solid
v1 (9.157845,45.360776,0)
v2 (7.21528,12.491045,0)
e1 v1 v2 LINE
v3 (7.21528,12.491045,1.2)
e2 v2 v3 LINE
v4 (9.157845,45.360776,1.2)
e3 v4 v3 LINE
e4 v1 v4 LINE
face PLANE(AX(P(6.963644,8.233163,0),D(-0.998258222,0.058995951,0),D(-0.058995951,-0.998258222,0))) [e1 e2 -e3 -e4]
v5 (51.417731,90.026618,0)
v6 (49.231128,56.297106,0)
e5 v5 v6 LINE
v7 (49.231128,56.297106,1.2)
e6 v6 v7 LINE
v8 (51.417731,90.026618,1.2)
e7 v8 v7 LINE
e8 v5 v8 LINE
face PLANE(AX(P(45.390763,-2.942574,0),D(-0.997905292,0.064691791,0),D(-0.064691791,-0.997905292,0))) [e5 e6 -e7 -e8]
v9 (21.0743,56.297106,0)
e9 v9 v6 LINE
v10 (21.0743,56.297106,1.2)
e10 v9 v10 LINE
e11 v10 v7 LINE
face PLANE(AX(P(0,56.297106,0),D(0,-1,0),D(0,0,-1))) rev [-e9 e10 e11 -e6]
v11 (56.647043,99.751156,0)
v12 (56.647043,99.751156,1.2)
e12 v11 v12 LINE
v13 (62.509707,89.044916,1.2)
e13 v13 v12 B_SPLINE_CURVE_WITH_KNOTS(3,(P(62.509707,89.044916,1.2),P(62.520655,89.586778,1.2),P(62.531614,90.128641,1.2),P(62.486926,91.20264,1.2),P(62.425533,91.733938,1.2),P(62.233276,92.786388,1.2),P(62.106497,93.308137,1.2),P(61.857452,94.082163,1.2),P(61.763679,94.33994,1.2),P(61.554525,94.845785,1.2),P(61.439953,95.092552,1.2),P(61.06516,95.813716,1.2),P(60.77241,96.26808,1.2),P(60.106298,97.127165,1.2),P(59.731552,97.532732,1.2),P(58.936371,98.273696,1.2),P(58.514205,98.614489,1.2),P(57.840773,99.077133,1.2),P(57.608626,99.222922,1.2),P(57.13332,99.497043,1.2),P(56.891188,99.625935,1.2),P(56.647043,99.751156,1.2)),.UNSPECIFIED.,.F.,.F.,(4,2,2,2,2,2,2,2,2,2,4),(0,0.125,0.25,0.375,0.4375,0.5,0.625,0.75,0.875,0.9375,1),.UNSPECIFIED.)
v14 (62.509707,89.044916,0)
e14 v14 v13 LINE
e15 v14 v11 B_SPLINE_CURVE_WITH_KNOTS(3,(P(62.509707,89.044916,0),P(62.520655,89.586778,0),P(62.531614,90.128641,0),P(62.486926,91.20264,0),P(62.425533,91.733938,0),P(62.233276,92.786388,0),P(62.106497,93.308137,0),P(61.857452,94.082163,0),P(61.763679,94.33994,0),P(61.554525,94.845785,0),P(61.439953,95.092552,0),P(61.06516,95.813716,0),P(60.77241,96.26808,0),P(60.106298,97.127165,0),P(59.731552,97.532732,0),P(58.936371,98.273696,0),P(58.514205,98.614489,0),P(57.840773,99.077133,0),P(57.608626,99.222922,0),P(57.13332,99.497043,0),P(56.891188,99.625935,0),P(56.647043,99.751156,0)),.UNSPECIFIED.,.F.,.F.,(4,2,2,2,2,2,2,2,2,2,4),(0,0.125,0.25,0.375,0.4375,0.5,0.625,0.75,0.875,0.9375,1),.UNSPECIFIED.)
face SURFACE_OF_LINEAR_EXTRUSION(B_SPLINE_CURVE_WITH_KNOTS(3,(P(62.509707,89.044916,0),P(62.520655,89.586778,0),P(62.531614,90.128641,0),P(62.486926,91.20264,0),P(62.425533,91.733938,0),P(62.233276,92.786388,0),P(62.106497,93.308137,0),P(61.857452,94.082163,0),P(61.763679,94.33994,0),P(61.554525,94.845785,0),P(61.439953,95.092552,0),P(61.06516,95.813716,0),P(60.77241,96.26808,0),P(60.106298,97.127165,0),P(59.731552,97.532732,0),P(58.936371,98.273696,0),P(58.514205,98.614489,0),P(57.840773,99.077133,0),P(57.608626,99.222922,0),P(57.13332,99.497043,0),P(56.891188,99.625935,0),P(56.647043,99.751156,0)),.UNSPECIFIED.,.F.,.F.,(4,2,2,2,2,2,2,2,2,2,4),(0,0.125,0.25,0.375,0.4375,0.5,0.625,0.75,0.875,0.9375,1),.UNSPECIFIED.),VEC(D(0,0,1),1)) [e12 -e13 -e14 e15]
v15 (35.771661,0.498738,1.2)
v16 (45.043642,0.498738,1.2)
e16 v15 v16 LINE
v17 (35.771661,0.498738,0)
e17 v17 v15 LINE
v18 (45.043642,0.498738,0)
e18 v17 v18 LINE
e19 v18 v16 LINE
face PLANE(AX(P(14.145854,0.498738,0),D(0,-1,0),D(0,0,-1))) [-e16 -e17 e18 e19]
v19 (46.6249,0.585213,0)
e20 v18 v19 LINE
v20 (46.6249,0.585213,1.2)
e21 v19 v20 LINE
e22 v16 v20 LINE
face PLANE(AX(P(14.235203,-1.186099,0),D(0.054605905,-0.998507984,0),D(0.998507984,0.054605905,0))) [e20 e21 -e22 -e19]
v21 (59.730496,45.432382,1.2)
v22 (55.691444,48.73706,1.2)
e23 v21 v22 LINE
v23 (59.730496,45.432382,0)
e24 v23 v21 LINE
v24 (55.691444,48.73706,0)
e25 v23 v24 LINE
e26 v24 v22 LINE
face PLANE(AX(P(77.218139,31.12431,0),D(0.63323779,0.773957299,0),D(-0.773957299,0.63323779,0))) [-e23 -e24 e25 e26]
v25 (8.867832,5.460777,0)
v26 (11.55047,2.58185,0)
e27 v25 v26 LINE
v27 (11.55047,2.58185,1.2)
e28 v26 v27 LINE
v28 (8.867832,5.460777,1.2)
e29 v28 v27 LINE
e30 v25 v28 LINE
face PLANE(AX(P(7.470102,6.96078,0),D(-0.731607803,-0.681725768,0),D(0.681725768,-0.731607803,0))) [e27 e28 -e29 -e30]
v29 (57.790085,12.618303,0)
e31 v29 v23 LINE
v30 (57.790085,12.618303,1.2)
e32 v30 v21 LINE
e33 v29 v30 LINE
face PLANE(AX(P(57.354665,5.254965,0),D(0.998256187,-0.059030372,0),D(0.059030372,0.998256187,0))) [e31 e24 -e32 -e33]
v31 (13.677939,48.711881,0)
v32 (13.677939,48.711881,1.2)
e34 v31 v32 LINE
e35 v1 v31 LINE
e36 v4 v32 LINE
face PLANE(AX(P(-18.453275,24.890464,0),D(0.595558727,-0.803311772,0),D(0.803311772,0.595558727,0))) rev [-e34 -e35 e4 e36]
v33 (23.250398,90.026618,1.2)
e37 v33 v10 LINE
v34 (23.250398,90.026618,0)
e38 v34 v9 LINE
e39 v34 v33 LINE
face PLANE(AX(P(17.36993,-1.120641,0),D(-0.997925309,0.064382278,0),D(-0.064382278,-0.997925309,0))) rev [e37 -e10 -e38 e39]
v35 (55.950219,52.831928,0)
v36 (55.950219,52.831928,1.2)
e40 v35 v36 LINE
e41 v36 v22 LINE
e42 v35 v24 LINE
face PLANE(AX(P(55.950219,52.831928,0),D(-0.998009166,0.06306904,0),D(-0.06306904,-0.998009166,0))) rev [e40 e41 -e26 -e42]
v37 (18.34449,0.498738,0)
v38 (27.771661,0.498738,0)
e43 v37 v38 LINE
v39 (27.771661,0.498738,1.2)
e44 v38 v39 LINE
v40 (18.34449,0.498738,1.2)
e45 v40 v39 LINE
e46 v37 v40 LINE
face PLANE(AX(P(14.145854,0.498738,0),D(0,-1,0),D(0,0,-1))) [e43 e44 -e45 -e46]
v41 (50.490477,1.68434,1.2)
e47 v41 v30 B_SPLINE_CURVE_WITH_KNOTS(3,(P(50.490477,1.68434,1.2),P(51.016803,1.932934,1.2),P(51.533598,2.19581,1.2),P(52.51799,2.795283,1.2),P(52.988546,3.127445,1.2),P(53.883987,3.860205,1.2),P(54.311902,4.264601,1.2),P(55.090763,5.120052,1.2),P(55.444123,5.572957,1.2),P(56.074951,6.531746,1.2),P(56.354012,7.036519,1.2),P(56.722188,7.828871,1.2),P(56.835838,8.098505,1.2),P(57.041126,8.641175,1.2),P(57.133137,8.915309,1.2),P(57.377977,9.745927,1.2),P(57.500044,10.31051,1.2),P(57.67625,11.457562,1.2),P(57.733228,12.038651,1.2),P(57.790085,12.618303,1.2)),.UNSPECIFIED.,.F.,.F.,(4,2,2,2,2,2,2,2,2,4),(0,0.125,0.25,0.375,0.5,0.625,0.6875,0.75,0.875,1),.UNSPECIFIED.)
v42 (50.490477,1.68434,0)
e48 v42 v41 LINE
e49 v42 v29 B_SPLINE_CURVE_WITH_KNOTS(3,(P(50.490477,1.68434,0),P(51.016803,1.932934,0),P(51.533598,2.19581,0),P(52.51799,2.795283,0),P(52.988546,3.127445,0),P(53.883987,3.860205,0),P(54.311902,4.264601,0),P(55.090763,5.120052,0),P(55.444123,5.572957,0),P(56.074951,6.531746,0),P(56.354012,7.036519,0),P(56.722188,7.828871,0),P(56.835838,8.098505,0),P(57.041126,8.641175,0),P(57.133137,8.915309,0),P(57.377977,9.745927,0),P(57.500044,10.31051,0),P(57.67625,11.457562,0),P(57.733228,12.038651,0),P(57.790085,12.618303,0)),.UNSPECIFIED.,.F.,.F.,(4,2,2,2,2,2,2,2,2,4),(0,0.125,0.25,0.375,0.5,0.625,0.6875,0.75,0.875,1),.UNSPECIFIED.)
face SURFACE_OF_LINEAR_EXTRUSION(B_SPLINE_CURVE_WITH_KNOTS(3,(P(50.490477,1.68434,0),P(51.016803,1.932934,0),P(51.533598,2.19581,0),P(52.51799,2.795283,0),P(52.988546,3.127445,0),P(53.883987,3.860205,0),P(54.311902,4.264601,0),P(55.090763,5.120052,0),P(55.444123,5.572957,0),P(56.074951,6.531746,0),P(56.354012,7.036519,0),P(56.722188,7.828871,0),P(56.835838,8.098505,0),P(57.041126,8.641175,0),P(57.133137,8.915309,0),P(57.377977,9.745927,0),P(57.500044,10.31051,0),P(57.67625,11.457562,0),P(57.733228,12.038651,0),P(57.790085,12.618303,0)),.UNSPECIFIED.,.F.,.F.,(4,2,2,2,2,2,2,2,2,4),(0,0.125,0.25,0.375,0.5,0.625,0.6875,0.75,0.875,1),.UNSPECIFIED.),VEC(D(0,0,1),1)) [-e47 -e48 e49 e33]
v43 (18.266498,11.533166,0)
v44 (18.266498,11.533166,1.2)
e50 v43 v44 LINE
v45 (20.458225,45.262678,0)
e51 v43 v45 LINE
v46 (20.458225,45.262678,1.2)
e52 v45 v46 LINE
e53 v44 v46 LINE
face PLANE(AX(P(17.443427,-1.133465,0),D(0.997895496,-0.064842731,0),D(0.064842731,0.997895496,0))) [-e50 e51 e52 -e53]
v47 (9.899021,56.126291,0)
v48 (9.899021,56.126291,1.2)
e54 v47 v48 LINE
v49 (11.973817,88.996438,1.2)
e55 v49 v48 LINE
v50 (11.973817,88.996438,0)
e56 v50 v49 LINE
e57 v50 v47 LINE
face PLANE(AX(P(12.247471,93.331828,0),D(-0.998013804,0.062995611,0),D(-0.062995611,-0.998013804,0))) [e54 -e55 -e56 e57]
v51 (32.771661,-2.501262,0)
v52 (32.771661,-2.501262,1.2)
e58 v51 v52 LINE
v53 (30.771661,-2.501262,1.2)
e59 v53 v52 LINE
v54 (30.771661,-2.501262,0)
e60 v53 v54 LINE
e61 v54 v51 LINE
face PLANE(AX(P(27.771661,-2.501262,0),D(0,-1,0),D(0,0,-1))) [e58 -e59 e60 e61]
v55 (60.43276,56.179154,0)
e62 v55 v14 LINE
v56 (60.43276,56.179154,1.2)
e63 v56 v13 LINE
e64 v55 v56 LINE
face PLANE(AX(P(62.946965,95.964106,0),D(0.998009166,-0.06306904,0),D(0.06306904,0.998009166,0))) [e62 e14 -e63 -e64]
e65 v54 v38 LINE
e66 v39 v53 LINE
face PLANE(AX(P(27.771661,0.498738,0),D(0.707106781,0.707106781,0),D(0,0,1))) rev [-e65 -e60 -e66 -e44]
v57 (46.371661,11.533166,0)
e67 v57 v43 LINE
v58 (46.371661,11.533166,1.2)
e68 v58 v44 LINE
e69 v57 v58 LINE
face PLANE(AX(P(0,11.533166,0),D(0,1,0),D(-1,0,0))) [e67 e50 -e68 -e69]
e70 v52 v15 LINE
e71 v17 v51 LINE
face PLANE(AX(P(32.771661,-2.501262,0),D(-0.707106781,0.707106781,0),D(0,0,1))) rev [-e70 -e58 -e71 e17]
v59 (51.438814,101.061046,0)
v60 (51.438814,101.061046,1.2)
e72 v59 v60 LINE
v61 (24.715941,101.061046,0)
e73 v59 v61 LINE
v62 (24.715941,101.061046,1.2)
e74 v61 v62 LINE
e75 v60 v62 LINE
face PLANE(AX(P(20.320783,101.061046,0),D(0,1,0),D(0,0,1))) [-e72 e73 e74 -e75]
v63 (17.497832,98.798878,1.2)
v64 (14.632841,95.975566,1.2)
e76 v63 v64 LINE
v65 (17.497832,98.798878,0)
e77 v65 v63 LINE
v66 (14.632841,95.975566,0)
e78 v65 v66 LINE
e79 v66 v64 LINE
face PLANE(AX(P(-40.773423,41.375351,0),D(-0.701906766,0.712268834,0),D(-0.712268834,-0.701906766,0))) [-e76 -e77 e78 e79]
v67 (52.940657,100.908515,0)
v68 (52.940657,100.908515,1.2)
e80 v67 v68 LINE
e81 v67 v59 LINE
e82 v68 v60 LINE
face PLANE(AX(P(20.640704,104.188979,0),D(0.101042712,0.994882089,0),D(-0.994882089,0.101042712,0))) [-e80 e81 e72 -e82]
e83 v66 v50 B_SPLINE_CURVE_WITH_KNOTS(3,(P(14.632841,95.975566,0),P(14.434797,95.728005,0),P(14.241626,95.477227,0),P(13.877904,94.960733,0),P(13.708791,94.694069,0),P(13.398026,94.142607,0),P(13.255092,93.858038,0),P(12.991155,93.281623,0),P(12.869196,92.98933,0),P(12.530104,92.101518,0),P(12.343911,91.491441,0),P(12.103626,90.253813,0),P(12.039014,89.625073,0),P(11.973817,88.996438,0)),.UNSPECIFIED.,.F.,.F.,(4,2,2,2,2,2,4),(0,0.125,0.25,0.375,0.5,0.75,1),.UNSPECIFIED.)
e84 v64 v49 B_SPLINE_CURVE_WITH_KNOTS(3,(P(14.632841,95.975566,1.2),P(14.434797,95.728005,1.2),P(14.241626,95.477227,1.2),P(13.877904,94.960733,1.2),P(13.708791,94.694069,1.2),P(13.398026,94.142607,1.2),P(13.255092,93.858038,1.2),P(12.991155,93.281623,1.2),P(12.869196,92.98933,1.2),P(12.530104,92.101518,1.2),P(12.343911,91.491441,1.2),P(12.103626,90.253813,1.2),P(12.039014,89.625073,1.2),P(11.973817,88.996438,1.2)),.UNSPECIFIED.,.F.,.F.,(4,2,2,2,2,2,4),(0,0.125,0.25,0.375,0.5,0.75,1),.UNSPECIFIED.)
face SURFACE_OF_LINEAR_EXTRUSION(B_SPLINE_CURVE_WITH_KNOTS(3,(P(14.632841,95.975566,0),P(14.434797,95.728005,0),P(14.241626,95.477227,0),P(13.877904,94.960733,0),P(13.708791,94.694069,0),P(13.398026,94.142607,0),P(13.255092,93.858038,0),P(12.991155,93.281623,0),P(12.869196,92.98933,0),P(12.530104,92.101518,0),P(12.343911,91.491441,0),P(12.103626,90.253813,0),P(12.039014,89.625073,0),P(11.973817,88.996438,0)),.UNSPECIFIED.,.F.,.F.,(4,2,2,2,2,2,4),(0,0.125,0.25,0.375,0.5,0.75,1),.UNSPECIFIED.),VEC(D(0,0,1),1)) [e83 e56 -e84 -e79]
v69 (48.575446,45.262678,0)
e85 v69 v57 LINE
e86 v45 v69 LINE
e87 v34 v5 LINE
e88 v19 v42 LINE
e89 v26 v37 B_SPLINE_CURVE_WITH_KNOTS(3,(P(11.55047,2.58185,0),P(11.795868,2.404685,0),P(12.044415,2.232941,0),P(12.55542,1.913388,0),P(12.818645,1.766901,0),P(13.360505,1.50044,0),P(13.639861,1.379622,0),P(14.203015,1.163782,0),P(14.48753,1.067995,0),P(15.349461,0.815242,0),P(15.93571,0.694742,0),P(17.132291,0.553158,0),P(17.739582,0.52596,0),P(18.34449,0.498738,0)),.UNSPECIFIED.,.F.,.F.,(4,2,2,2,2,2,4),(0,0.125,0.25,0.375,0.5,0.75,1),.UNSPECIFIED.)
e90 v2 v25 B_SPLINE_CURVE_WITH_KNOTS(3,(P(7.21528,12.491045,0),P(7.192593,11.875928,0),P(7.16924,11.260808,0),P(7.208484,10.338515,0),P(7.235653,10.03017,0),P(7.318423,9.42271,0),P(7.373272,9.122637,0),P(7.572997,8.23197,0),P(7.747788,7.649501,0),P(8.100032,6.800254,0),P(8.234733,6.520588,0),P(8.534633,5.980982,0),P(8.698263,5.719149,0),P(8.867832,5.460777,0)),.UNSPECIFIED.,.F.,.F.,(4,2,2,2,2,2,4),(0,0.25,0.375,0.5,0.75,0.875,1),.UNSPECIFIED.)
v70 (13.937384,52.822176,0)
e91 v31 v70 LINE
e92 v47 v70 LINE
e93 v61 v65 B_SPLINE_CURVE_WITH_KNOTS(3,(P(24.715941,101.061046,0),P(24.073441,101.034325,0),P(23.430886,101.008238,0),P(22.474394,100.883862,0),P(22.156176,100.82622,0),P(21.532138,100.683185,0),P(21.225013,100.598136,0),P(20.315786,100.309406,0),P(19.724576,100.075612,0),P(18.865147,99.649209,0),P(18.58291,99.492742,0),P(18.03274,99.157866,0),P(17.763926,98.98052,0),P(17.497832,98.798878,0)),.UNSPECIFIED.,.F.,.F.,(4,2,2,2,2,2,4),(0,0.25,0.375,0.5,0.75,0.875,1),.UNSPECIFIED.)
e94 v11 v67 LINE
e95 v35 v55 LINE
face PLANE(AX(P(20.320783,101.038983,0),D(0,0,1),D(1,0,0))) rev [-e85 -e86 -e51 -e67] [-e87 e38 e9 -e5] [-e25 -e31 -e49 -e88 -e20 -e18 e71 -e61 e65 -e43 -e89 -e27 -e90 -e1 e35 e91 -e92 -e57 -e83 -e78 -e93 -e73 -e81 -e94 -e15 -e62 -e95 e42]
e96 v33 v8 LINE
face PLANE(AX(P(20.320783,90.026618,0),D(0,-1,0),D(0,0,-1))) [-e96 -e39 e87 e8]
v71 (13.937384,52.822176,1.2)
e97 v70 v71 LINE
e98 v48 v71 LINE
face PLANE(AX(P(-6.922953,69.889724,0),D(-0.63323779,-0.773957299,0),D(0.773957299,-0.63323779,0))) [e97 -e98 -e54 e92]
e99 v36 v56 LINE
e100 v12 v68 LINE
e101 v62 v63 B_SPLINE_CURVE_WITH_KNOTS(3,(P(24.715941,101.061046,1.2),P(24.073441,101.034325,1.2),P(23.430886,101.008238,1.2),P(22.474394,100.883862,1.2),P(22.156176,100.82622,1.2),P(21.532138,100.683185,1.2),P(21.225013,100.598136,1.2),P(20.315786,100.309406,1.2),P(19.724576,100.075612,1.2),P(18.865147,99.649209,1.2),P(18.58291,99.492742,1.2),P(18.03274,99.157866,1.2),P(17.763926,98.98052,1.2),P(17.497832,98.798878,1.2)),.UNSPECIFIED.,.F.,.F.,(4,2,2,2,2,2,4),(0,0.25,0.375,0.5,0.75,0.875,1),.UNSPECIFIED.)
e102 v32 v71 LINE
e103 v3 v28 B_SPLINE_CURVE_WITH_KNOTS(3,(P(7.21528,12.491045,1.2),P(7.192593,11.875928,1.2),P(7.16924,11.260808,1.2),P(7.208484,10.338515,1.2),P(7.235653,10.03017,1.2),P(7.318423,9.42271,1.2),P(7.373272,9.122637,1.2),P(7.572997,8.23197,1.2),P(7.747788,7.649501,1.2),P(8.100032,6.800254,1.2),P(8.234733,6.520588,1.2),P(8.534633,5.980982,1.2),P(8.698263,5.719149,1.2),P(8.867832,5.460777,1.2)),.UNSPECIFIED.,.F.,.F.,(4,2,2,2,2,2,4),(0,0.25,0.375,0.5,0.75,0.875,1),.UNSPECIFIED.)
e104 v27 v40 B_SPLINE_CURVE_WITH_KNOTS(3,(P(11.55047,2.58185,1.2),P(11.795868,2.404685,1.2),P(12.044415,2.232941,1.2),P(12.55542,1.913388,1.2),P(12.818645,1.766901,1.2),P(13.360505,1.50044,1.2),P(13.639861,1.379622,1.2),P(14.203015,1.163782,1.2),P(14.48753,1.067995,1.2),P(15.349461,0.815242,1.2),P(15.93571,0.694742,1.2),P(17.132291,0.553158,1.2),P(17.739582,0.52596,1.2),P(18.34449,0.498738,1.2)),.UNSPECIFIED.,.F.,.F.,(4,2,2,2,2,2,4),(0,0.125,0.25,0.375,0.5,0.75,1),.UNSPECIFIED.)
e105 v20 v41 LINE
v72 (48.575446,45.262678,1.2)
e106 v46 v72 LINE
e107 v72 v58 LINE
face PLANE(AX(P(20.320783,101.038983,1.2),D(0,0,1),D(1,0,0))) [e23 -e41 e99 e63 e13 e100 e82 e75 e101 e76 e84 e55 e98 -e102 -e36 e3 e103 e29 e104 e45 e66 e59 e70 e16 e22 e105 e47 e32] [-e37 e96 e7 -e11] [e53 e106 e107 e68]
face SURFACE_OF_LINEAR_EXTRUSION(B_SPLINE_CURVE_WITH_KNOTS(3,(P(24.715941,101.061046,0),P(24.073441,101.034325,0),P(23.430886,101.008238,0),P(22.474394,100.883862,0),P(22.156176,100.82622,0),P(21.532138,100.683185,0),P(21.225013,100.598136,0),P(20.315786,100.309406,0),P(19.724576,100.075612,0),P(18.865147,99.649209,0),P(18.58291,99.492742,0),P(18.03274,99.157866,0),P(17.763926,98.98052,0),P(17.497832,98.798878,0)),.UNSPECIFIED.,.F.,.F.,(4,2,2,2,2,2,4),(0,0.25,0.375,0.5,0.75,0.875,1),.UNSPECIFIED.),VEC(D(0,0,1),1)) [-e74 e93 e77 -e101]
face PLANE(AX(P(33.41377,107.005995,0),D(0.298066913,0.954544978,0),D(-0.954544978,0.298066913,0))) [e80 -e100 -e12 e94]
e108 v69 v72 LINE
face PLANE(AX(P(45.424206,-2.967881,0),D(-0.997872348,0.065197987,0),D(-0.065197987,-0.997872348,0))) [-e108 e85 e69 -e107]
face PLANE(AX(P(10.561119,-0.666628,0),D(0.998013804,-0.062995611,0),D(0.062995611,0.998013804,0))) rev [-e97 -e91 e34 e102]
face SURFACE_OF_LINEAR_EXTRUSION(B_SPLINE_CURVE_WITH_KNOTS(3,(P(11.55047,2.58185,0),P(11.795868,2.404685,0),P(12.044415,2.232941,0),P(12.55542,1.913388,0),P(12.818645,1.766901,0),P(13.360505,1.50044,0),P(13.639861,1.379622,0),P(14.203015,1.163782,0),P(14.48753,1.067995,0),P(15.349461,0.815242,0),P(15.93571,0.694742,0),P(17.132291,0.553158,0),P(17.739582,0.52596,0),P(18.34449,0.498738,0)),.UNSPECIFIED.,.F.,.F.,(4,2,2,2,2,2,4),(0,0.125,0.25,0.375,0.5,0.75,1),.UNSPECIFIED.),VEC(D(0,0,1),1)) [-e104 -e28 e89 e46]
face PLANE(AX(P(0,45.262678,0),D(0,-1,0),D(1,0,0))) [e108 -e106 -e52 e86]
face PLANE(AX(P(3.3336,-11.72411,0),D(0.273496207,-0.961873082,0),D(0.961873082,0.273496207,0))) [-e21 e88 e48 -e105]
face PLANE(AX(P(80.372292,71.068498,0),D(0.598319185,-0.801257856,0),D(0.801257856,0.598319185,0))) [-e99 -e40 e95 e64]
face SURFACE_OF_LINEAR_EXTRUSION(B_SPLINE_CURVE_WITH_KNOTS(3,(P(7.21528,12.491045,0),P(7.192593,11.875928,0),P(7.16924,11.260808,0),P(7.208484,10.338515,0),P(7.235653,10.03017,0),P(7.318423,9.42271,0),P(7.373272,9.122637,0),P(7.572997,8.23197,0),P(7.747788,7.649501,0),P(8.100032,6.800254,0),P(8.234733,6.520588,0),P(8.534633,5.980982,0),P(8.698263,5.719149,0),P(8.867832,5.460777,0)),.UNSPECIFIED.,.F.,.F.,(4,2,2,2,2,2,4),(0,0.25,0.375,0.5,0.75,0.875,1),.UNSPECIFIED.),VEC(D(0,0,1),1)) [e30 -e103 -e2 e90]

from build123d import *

# Parameters (mm, degrees)
EXTRUDE_1_DEPTH     = 1.2
EXTRUDE_1_2_DEPTH   = 1.2
EXTRUDE_1_3_DEPTH   = 1.2
EXTRUDE_1_4_DEPTH   = 1.2
EXTRUDE_1_5_DEPTH   = 1.2
EXTRUDE_1_6_DEPTH   = 1.2
EXTRUDE_1_7_DEPTH   = 1.2
CUT_EXTRUDE_START   = -1.2
CUT_EXTRUDE_1_DEPTH = 1.2
EXTRUDE_2_DEPTH     = 1.2
SKETCH_4_W          = 8
SKETCH_4_H          = 3
EXTRUDE_3_DEPTH     = 1.2
CHAMFER_1_SIZE      = 3


# Read off the part's stored shape, not the designer's step: Вырез-Вытянуть-Тонкостенный1
with BuildPart() as part:
    # Эскиз1 → Бобышка-Вытянуть1 (new body)
    with BuildSketch(Plane.XY):
        with BuildLine():
            Line((48.715381083, 89.326618208), (25.633974438, 89.326618208))
            Line((25.633974438, 89.326618208), (16.424726332, 98.90501339))
            add(Edge.make_bspline(
                [(16.424726332, 98.90501339), (17.046442876, 99.341649928), (18.267344562, 100.199099019), (20.315095034, 101.097084096), (22.468240975, 101.668181371), (23.953020919, 101.729925319), (24.701392351, 101.76104603)],
                knots=[0, 0, 0, 0, 1.020658978, 2.004328627, 2.994124718, 4, 4, 4, 4], degree=3))
            Line((24.701392351, 101.76104603), (51.474269756, 101.76104603))
            Line((51.474269756, 101.76104603), (53.96115532, 101.508471715))
            Line((53.96115532, 101.508471715), (48.715381083, 89.326618208))
        make_face()
    extrude(amount=EXTRUDE_1_DEPTH)


with BuildPart() as body_2:
    # Эскиз1 → Extrude 1 2 (new body)
    with BuildSketch(Plane.XY):
        with BuildLine():
            Line((50.522258876, 87.034020578), (56.292610537, 100.711891183))
            add(Edge.make_bspline(
                [(56.292610537, 100.711891183), (56.872426459, 100.424489235), (57.992774107, 99.869157649), (59.468715814, 98.779028645), (60.7115741, 97.54513856), (61.719561272, 96.151707655), (62.467267736, 94.583389711), (62.961857151, 92.863872855), (63.249109501, 90.9875998), (63.222892422, 89.690287211), (63.209261013, 89.015757512)],
                knots=[0, 0, 0, 0, 1.065948377, 2.059675685, 3.011626956, 3.94566096, 4.882319089, 5.862745984, 6.888747923, 8, 8, 8, 8], degree=3))
            Line((63.209261013, 89.015757512), (61.110951318, 55.811949469))
            Line((61.110951318, 55.811949469), (56.661757613, 52.489625785))
            Line((56.661757613, 52.489625785), (48.695952289, 58.862270044))
            Line((48.695952289, 58.862270044), (50.522258876, 87.034020578))
        make_face()
    extrude(amount=EXTRUDE_1_2_DEPTH)


with BuildPart() as body_3:
    # Эскиз1 → Extrude 1 3 (new body)
    with BuildSketch(Plane.XY):
        with BuildLine():
            Line((47.705083822, 42.678085082), (56.389754504, 49.070158134))
            Line((56.389754504, 49.070158134), (60.45037234, 45.74783445))
            Line((60.45037234, 45.74783445), (58.488064199, 12.5634552))
            add(Edge.make_bspline(
                [(58.488064199, 12.5634552), (58.420496696, 11.874587816), (58.28970777, 10.541162419), (57.823949094, 8.625296868), (57.098173468, 6.888651889), (56.155918884, 5.305629758), (54.972806214, 3.892910011), (53.56092009, 2.640506095), (51.90764089, 1.560277715), (50.685929609, 1.000522637), (50.055967832, 0.711891183)],
                knots=[0, 0, 0, 0, 1.076355317, 2.083477241, 3.054916997, 3.995219207, 4.939832775, 5.910749548, 6.922701339, 8, 8, 8, 8], degree=3))
            Line((50.055967832, 0.711891183), (45.859348442, 14.428619374))
            Line((45.859348442, 14.428619374), (47.705083822, 42.678085082))
        make_face()
    extrude(amount=EXTRUDE_1_3_DEPTH)


with BuildPart() as body_4:
    # Эскиз1 → Extrude 1 4 (new body)
    with BuildSketch(Plane.XY):
        with BuildLine():
            Line((20.815633657, 12.233165711), (43.877611508, 12.233165711))
            Line((43.877611508, 12.233165711), (47.549653474, -0.065260556))
            Line((47.549653474, -0.065260556), (45.06276791, -0.201262111))
            Line((45.06276791, -0.201262111), (18.328748093, -0.201262111))
            add(Edge.make_bspline(
                [(18.328748093, -0.201262111), (17.587342725, -0.16790088), (16.138327284, -0.102699115), (14.051390965, 0.415320239), (12.125296995, 1.268374835), (11.016129357, 2.10124066), (10.460086737, 2.518768975)],
                knots=[0, 0, 0, 0, 1.046522757, 2.045342129, 3.020100256, 4, 4, 4, 4], degree=3))
            Line((10.460086737, 2.518768975), (20.815633657, 12.233165711))
        make_face()
    extrude(amount=EXTRUDE_1_4_DEPTH)


with BuildPart() as body_5:
    # Эскиз1 → Extrude 1 5 (new body)
    with BuildSketch(Plane.XY):
        with BuildLine():
            Line((19.144757418, 14.253760232), (8.750352911, 4.383933149))
            add(Edge.make_bspline(
                [(8.750352911, 4.383933149), (8.347830199, 4.971791124), (7.548998065, 6.138432973), (6.823323675, 8.155816029), (6.434028016, 10.301026142), (6.488276416, 11.771820349), (6.516041662, 12.524597613)],
                knots=[0, 0, 0, 0, 0.987067533, 1.958898816, 2.955330013, 4, 4, 4, 4], degree=3))
            Line((6.516041662, 12.524597613), (8.478349802, 45.728405657))
            Line((8.478349802, 45.728405657), (12.985829888, 49.070158134))
            Line((12.985829888, 49.070158134), (20.990492798, 42.658656288))
            Line((20.990492798, 42.658656288), (19.144757418, 14.253760232))
        make_face()
    extrude(amount=EXTRUDE_1_5_DEPTH)


with BuildPart() as body_6:
    # Эскиз1 → Extrude 1 6 (new body)
    with BuildSketch(Plane.XY):
        with BuildLine():
            Line((21.942503678, 58.881698837), (13.238404203, 52.489625785))
            Line((13.238404203, 52.489625785), (9.177786367, 55.811949469))
            Line((9.177786367, 55.811949469), (11.276096062, 89.054615099))
            add(Edge.make_bspline(
                [(11.276096062, 89.054615099), (11.352568907, 89.792004626), (11.503633208, 91.248642381), (12.205959169, 93.332866685), (13.177672166, 95.318642991), (14.120219983, 96.460520121), (14.598419746, 97.039849216)],
                knots=[0, 0, 0, 0, 1.007070456, 1.989364909, 2.979908279, 4, 4, 4, 4], degree=3))
            Line((14.598419746, 97.039849216), (23.768810265, 87.189450926))
            Line((23.768810265, 87.189450926), (21.942503678, 58.881698837))
        make_face()
    extrude(amount=EXTRUDE_1_6_DEPTH)


with BuildPart() as body_7:
    # Эскиз1 → Extrude 1 7 (new body)
    with BuildSketch(Plane.XY):
        Polygon((14.948138029, 50.77989196), (23.613379917, 56.997105871), (46.811359323, 56.997105871), (54.680020679, 50.77989196), (46.034207584, 44.562678049), (22.816799385, 44.562678049), align=None)
    extrude(amount=EXTRUDE_1_7_DEPTH)


with BuildPart() as cut_extrude_1_tool:
    # Вырез-Вытянуть-Тонкостенный1 outline → Вырез-Вытянуть-Тонкостенный1 (new body)
    # profile 1 of 7: a face of its own
    with BuildSketch(Plane.XY.offset(1.2).offset(CUT_EXTRUDE_START)):
        with BuildLine():
            add(Edge.make_bspline(
                [(16.424726332, 98.90501339), (17.046442876, 99.341649928), (18.267344562, 100.199099019), (20.315095034, 101.097084096), (22.468240975, 101.668181371), (23.953020919, 101.729925319), (24.701392351, 101.76104603)],
                knots=[0, 0, 0, 0, 0.255164744, 0.501082157, 0.74853118, 1, 1, 1, 1], degree=3))
            Line((16.424726332, 98.90501339), (25.633974438, 89.326618208))
            Line((25.633974438, 89.326618208), (48.715381083, 89.326618208))
            Line((48.715381083, 89.326618208), (53.96115532, 101.508471715))
            Line((53.96115532, 101.508471715), (51.474269756, 101.76104603))
            Line((51.474269756, 101.76104603), (24.701392351, 101.76104603))
        make_face()
        with BuildLine():
            add(Edge.make_bspline(
                [(24.715941202, 101.06104603), (24.073440985, 101.034324979), (23.430886148, 101.008238304), (22.474393504, 100.88386239), (22.156175981, 100.826220075), (21.532137699, 100.683185135), (21.225013046, 100.59813608), (20.315786313, 100.309405985), (19.724576172, 100.075612456), (18.865147168, 99.649208655), (18.582909623, 99.492741509), (18.032739645, 99.157865771), (17.763926458, 98.980519597), (17.497832435, 98.79887764)],
                knots=[0, 0, 0, 0, 0.25, 0.25, 0.375, 0.375, 0.5, 0.5, 0.75, 0.75, 0.875, 0.875, 1, 1, 1, 1], degree=3))
            Line((24.715941202, 101.06104603), (51.438814077, 101.06104603))
            Line((51.438814077, 101.06104603), (52.940656917, 100.908515117))
            Line((52.940656917, 100.908515117), (48.254672603, 90.026618208))
            Line((48.254672603, 90.026618208), (25.932012903, 90.026618208))
            Line((25.932012903, 90.026618208), (17.497832435, 98.79887764))
        make_face(mode=Mode.SUBTRACT)
    # profile 2 of 7: a face of its own
    with BuildSketch(Plane.XY.offset(1.2).offset(CUT_EXTRUDE_START)):
        with BuildLine():
            add(Edge.make_bspline(
                [(58.488064199, 12.5634552), (58.420496696, 11.874587816), (58.28970777, 10.541162419), (57.823949094, 8.625296868), (57.098173468, 6.888651889), (56.155918884, 5.305629758), (54.972806214, 3.892910011), (53.56092009, 2.640506095), (51.90764089, 1.560277715), (50.685929609, 1.000522637), (50.055967832, 0.711891183)],
                knots=[0, 0, 0, 0, 0.134544415, 0.260434655, 0.381864625, 0.499402401, 0.617479097, 0.738843694, 0.865337667, 1, 1, 1, 1], degree=3))
            Line((58.488064199, 12.5634552), (60.45037234, 45.74783445))
            Line((60.45037234, 45.74783445), (56.389754504, 49.070158134))
            Line((56.389754504, 49.070158134), (47.705083822, 42.678085082))
            Line((47.705083822, 42.678085082), (45.859348442, 14.428619374))
            Line((45.859348442, 14.428619374), (50.055967832, 0.711891183))
        make_face()
        with BuildLine():
            add(Edge.make_bspline(
                [(50.490477038, 1.684339901), (51.016803061, 1.932934245), (51.533598279, 2.195809917), (52.51798996, 2.795282573), (52.988546029, 3.127444771), (53.883987055, 3.860204526), (54.311901532, 4.26460134), (55.090762842, 5.120051505), (55.44412253, 5.572957078), (56.074950898, 6.531746368), (56.354011587, 7.036518731), (56.722187981, 7.828870826), (56.835838323, 8.098504952), (57.041125652, 8.641174625), (57.133136752, 8.915309199), (57.377976964, 9.745926597), (57.500043582, 10.310509714), (57.676250384, 11.457562148), (57.733227854, 12.03865129), (57.79008471, 12.6183025)],
                knots=[0, 0, 0, 0, 0.125, 0.125, 0.25, 0.25, 0.375, 0.375, 0.5, 0.5, 0.625, 0.625, 0.6875, 0.6875, 0.75, 0.75, 0.875, 0.875, 1, 1, 1, 1], degree=3))
            Line((50.490477038, 1.684339901), (46.566214612, 14.510864312))
            Line((46.566214612, 14.510864312), (48.382357411, 42.307407778))
            Line((48.382357411, 42.307407778), (56.367054799, 48.184287958))
            Line((56.367054799, 48.184287958), (59.73049572, 45.43238175))
            Line((59.73049572, 45.43238175), (57.79008471, 12.6183025))
        make_face(mode=Mode.SUBTRACT)
    # profile 3 of 7: a face of its own
    with BuildSketch(Plane.XY.offset(1.2).offset(CUT_EXTRUDE_START)):
        with BuildLine():
            add(Edge.make_bspline(
                [(18.328748093, -0.201262111), (17.587342725, -0.16790088), (16.138327284, -0.102699115), (14.051390965, 0.415320239), (12.125296995, 1.268374835), (11.016129357, 2.10124066), (10.460086737, 2.518768975)],
                knots=[0, 0, 0, 0, 0.261630689, 0.511335532, 0.755025064, 1, 1, 1, 1], degree=3))
            Line((18.328748093, -0.201262111), (45.06276791, -0.201262111))
            Line((45.06276791, -0.201262111), (47.549653474, -0.065260556))
            Line((47.549653474, -0.065260556), (43.877611508, 12.233165711))
            Line((43.877611508, 12.233165711), (20.815633657, 12.233165711))
            Line((20.815633657, 12.233165711), (10.460086737, 2.518768975))
        make_face()
        with BuildLine():
            add(Edge.make_bspline(
                [(11.550470184, 2.5818496), (11.795867518, 2.404685246), (12.04441495, 2.232941282), (12.55541981, 1.913388359), (12.818645158, 1.766900763), (13.360505008, 1.500440183), (13.639861318, 1.37962177), (14.203014591, 1.163782269), (14.487530387, 1.067995459), (15.349461212, 0.815242091), (15.935710043, 0.694741726), (17.132291051, 0.553157757), (17.739582498, 0.525960144), (18.34448977, 0.498737889)],
                knots=[0, 0, 0, 0, 0.125, 0.125, 0.25, 0.25, 0.375, 0.375, 0.5, 0.5, 0.75, 0.75, 1, 1, 1, 1], degree=3))
            Line((11.550470184, 2.5818496), (21.092573159, 11.533165711))
            Line((21.092573159, 11.533165711), (43.356080156, 11.533165711))
            Line((43.356080156, 11.533165711), (46.624900169, 0.585212969))
            Line((46.624900169, 0.585212969), (45.043641575, 0.498737889))
            Line((45.043641575, 0.498737889), (18.34448977, 0.498737889))
        make_face(mode=Mode.SUBTRACT)
    # profile 4 of 7: a face of its own
    with BuildSketch(Plane.XY.offset(1.2).offset(CUT_EXTRUDE_START)):
        with BuildLine():
            add(Edge.make_bspline(
                [(8.750352911, 4.383933149), (8.347830199, 4.971791124), (7.548998065, 6.138432973), (6.823323675, 8.155816029), (6.434028016, 10.301026142), (6.488276416, 11.771820349), (6.516041662, 12.524597613)],
                knots=[0, 0, 0, 0, 0.246766883, 0.489724704, 0.738832503, 1, 1, 1, 1], degree=3))
            Line((8.750352911, 4.383933149), (19.144757418, 14.253760232))
            Line((19.144757418, 14.253760232), (20.990492798, 42.658656288))
            Line((20.990492798, 42.658656288), (12.985829888, 49.070158134))
            Line((12.985829888, 49.070158134), (8.478349802, 45.728405657))
            Line((8.478349802, 45.728405657), (6.516041662, 12.524597613))
        make_face()
        with BuildLine():
            add(Edge.make_bspline(
                [(7.215280083, 12.491044523), (7.192593087, 11.875928134), (7.169240469, 11.260808285), (7.208484477, 10.338514623), (7.235652525, 10.030169922), (7.318423295, 9.422710186), (7.373272427, 9.122636757), (7.572996989, 8.231969766), (7.747788139, 7.649500612), (8.100031678, 6.800254206), (8.234732821, 6.520587684), (8.534633236, 5.98098186), (8.698262824, 5.719148815), (8.86783246, 5.460776557)],
                knots=[0, 0, 0, 0, 0.25, 0.25, 0.375, 0.375, 0.5, 0.5, 0.75, 0.75, 0.875, 0.875, 1, 1, 1, 1], degree=3))
            Line((7.215280083, 12.491044523), (9.157844696, 45.360776429))
            Line((9.157844696, 45.360776429), (12.969316506, 48.186522772))
            Line((12.969316506, 48.186522772), (20.268325319, 42.340229305))
            Line((20.268325319, 42.340229305), (18.464002717, 14.572654109))
            Line((18.464002717, 14.572654109), (8.86783246, 5.460776557))
        make_face(mode=Mode.SUBTRACT)
    # profile 5 of 7: a face of its own
    with BuildSketch(Plane.XY.offset(1.2).offset(CUT_EXTRUDE_START)):
        with BuildLine():
            add(Edge.make_bspline(
                [(56.292610537, 100.711891183), (56.872426459, 100.424489235), (57.992774107, 99.869157649), (59.468715814, 98.779028645), (60.7115741, 97.54513856), (61.719561272, 96.151707655), (62.467267736, 94.583389711), (62.961857151, 92.863872855), (63.249109501, 90.9875998), (63.222892422, 89.690287211), (63.209261013, 89.015757512)],
                knots=[0, 0, 0, 0, 0.133243547, 0.257459461, 0.376453369, 0.49320762, 0.610289886, 0.732843248, 0.86109349, 1, 1, 1, 1], degree=3))
            Line((56.292610537, 100.711891183), (50.522258876, 87.034020578))
            Line((50.522258876, 87.034020578), (48.695952289, 58.862270044))
            Line((48.695952289, 58.862270044), (56.661757613, 52.489625785))
            Line((56.661757613, 52.489625785), (61.110951318, 55.811949469))
            Line((61.110951318, 55.811949469), (63.209261013, 89.015757512))
        make_face()
        with BuildLine():
            add(Edge.make_bspline(
                [(62.509707325, 89.044916143), (62.520655005, 89.586777516), (62.531614092, 90.128640554), (62.486925974, 91.202640138), (62.425532622, 91.733937577), (62.233275726, 92.786387746), (62.106497215, 93.308137014), (61.857452254, 94.0821631), (61.76367931, 94.339939524), (61.554525349, 94.845784711), (61.439952755, 95.092551689), (61.065159761, 95.813715522), (60.772410336, 96.268079972), (60.10629843, 97.127164795), (59.731552001, 97.532731648), (58.936371123, 98.273695822), (58.514205064, 98.614488539), (57.840773045, 99.07713333), (57.608626021, 99.22292192), (57.133319735, 99.497043126), (56.891187647, 99.625934561), (56.647043471, 99.75115614)],
                knots=[0, 0, 0, 0, 0.125, 0.125, 0.25, 0.25, 0.375, 0.375, 0.4375, 0.4375, 0.5, 0.5, 0.625, 0.625, 0.75, 0.75, 0.875, 0.875, 0.9375, 0.9375, 1, 1, 1, 1], degree=3))
            Line((62.509707325, 89.044916143), (60.432760377, 56.179153792))
            Line((60.432760377, 56.179153792), (56.676505558, 53.374264822))
            Line((56.676505558, 53.374264822), (49.418084276, 59.181001848))
            Line((49.418084276, 59.181001848), (51.213147748, 86.870810722))
            Line((51.213147748, 86.870810722), (56.647043471, 99.75115614))
        make_face(mode=Mode.SUBTRACT)
    # profile 6 of 7: a face of its own
    with BuildSketch(Plane.XY.offset(1.2).offset(CUT_EXTRUDE_START)):
        with BuildLine():
            add(Edge.make_bspline(
                [(11.276096062, 89.054615099), (11.352568907, 89.792004626), (11.503633208, 91.248642381), (12.205959169, 93.332866685), (13.177672166, 95.318642991), (14.120219983, 96.460520121), (14.598419746, 97.039849216)],
                knots=[0, 0, 0, 0, 0.251767614, 0.497341227, 0.74497707, 1, 1, 1, 1], degree=3))
            Line((11.276096062, 89.054615099), (9.177786367, 55.811949469))
            Line((9.177786367, 55.811949469), (13.238404203, 52.489625785))
            Line((13.238404203, 52.489625785), (21.942503678, 58.881698837))
            Line((21.942503678, 58.881698837), (23.768810265, 87.189450926))
            Line((23.768810265, 87.189450926), (14.598419746, 97.039849216))
        make_face()
        with BuildLine():
            add(Edge.make_bspline(
                [(14.632841243, 95.975566267), (14.434797367, 95.728005104), (14.241625925, 95.477226659), (13.877903829, 94.960733196), (13.708791385, 94.694068524), (13.398026362, 94.142607351), (13.255091928, 93.858038457), (12.991155221, 93.281622928), (12.869195506, 92.989330109), (12.530104488, 92.101518005), (12.343911454, 91.491441144), (12.103625715, 90.253812557), (12.03901401, 89.62507322), (11.973817002, 88.996438494)],
                knots=[0, 0, 0, 0, 0.125, 0.125, 0.25, 0.25, 0.375, 0.375, 0.5, 0.5, 0.75, 0.75, 1, 1, 1, 1], degree=3))
            Line((14.632841243, 95.975566267), (23.05083291, 86.933359116))
            Line((23.05083291, 86.933359116), (21.264978981, 59.252623217))
            Line((21.264978981, 59.252623217), (13.261566694, 53.375117319))
            Line((13.261566694, 53.375117319), (9.899021021, 56.126291051))
            Line((9.899021021, 56.126291051), (11.973817002, 88.996438494))
        make_face(mode=Mode.SUBTRACT)
    # profile 7 of 7: a face of its own
    with BuildSketch(Plane.XY.offset(1.2).offset(CUT_EXTRUDE_START)):
        Polygon((23.613379917, 56.997105871), (14.948138029, 50.77989196), (22.816799385, 44.562678049), (46.034207584, 44.562678049), (54.680020679, 50.77989196), (46.811359323, 56.997105871), align=None)
        Polygon((16.111349946, 50.752945787), (23.838523063, 56.297105871), (46.568188655, 56.297105871), (53.517615169, 50.806200971), (45.808653605, 45.262678049), (23.059970052, 45.262678049), align=None, mode=Mode.SUBTRACT)
    extrude(amount=CUT_EXTRUDE_1_DEPTH)


with BuildPart() as part_1:
    add(part.part)

    # Вырез-Вытянуть-Тонкостенный1: cut by cut_extrude_1_tool
    add(cut_extrude_1_tool.part, mode=Mode.SUBTRACT)



with BuildPart() as body_2_1:
    add(body_2.part)

    # Вырез-Вытянуть-Тонкостенный1: cut by cut_extrude_1_tool
    add(cut_extrude_1_tool.part, mode=Mode.SUBTRACT)


with BuildPart() as body_3_1:
    add(body_3.part)

    # Вырез-Вытянуть-Тонкостенный1: cut by cut_extrude_1_tool
    add(cut_extrude_1_tool.part, mode=Mode.SUBTRACT)


with BuildPart() as body_4_1:
    add(body_4.part)

    # Вырез-Вытянуть-Тонкостенный1: cut by cut_extrude_1_tool
    add(cut_extrude_1_tool.part, mode=Mode.SUBTRACT)


with BuildPart() as body_5_1:
    add(body_5.part)

    # Вырез-Вытянуть-Тонкостенный1: cut by cut_extrude_1_tool
    add(cut_extrude_1_tool.part, mode=Mode.SUBTRACT)


with BuildPart() as body_6_1:
    add(body_6.part)

    # Вырез-Вытянуть-Тонкостенный1: cut by cut_extrude_1_tool
    add(cut_extrude_1_tool.part, mode=Mode.SUBTRACT)


with BuildPart() as body_7_1:
    add(body_7.part)

    # Вырез-Вытянуть-Тонкостенный1: cut by cut_extrude_1_tool
    add(cut_extrude_1_tool.part, mode=Mode.SUBTRACT)


with BuildPart() as part_2:
    add(part_1.part)

    add(body_2_1.part)  # Бобышка-Вытянуть2 merges body 2

    add(body_3_1.part)  # Бобышка-Вытянуть2 merges body 3

    add(body_4_1.part)  # Бобышка-Вытянуть2 merges body 4

    add(body_5_1.part)  # Бобышка-Вытянуть2 merges body 5

    add(body_6_1.part)  # Бобышка-Вытянуть2 merges body 6

    add(body_7_1.part)  # Бобышка-Вытянуть2 merges body 7
    # Эскиз3 → Бобышка-Вытянуть2 (add)
    with BuildSketch(Plane.XY.offset(1.2)):
        Polygon((23.250398012, 90.026618208), (23.06040377, 87.081707459), (23.05083291, 86.933359116), (14.632841243, 95.975566267), (17.497832435, 98.79887764), (25.932012903, 90.026618208), align=None)
        Polygon((48.254672603, 90.026618208), (51.41773113, 90.026618208), (51.213147748, 86.870810722), (56.647043471, 99.75115614), (52.940656917, 100.908515117), align=None)
        Polygon((13.677938559, 48.7118805), (13.937384418, 52.822175544), (13.261566694, 53.375117319), (21.264978981, 59.252623217), (21.074300442, 56.297105871), (23.838523063, 56.297105871), (16.111349946, 50.752945787), (23.059970052, 45.262678049), (20.458224519, 45.262678049), (20.268325319, 42.340229305), (12.969316506, 48.186522772), align=None)
        Polygon((8.86783246, 5.460776557), (18.464002717, 14.572654109), (18.266498341, 11.533165711), (21.092573159, 11.533165711), (11.550470184, 2.5818496), align=None)
        Polygon((46.566214612, 14.510864312), (50.490477038, 1.684339901), (46.624900169, 0.585212969), (43.356080156, 11.533165711), (46.371660715, 11.533165711), align=None)
        Polygon((49.418084276, 59.181001848), (56.676505558, 53.374264822), (55.950218762, 52.831928394), (55.691444183, 48.73706028), (56.367054799, 48.184287958), (48.382357411, 42.307407778), (48.575445909, 45.262678049), (45.808653605, 45.262678049), (53.517615169, 50.806200971), (46.568188655, 56.297105871), (49.231128261, 56.297105871), align=None)
    extrude(amount=-EXTRUDE_2_DEPTH)

    # Эскиз4 → Бобышка-Вытянуть3 (add)
    with BuildSketch(Plane.XY.offset(1.2)):
        with Locations((31.771660715, -1.001262111)):
            Rectangle(SKETCH_4_W, SKETCH_4_H)
    extrude(amount=-EXTRUDE_3_DEPTH)

    # Фаска1
    chamfer_1_edges = [part_2.edges().sort_by_distance(p)[0] for p in [
        (35.771660715, -2.501262111, 0.6),
        (27.771660715, -2.501262111, 0.6),
    ]]
    chamfer(chamfer_1_edges, length=CHAMFER_1_SIZE - 0.0001)  # a hair under: the kernel refuses the full size


solid = part_2.part
